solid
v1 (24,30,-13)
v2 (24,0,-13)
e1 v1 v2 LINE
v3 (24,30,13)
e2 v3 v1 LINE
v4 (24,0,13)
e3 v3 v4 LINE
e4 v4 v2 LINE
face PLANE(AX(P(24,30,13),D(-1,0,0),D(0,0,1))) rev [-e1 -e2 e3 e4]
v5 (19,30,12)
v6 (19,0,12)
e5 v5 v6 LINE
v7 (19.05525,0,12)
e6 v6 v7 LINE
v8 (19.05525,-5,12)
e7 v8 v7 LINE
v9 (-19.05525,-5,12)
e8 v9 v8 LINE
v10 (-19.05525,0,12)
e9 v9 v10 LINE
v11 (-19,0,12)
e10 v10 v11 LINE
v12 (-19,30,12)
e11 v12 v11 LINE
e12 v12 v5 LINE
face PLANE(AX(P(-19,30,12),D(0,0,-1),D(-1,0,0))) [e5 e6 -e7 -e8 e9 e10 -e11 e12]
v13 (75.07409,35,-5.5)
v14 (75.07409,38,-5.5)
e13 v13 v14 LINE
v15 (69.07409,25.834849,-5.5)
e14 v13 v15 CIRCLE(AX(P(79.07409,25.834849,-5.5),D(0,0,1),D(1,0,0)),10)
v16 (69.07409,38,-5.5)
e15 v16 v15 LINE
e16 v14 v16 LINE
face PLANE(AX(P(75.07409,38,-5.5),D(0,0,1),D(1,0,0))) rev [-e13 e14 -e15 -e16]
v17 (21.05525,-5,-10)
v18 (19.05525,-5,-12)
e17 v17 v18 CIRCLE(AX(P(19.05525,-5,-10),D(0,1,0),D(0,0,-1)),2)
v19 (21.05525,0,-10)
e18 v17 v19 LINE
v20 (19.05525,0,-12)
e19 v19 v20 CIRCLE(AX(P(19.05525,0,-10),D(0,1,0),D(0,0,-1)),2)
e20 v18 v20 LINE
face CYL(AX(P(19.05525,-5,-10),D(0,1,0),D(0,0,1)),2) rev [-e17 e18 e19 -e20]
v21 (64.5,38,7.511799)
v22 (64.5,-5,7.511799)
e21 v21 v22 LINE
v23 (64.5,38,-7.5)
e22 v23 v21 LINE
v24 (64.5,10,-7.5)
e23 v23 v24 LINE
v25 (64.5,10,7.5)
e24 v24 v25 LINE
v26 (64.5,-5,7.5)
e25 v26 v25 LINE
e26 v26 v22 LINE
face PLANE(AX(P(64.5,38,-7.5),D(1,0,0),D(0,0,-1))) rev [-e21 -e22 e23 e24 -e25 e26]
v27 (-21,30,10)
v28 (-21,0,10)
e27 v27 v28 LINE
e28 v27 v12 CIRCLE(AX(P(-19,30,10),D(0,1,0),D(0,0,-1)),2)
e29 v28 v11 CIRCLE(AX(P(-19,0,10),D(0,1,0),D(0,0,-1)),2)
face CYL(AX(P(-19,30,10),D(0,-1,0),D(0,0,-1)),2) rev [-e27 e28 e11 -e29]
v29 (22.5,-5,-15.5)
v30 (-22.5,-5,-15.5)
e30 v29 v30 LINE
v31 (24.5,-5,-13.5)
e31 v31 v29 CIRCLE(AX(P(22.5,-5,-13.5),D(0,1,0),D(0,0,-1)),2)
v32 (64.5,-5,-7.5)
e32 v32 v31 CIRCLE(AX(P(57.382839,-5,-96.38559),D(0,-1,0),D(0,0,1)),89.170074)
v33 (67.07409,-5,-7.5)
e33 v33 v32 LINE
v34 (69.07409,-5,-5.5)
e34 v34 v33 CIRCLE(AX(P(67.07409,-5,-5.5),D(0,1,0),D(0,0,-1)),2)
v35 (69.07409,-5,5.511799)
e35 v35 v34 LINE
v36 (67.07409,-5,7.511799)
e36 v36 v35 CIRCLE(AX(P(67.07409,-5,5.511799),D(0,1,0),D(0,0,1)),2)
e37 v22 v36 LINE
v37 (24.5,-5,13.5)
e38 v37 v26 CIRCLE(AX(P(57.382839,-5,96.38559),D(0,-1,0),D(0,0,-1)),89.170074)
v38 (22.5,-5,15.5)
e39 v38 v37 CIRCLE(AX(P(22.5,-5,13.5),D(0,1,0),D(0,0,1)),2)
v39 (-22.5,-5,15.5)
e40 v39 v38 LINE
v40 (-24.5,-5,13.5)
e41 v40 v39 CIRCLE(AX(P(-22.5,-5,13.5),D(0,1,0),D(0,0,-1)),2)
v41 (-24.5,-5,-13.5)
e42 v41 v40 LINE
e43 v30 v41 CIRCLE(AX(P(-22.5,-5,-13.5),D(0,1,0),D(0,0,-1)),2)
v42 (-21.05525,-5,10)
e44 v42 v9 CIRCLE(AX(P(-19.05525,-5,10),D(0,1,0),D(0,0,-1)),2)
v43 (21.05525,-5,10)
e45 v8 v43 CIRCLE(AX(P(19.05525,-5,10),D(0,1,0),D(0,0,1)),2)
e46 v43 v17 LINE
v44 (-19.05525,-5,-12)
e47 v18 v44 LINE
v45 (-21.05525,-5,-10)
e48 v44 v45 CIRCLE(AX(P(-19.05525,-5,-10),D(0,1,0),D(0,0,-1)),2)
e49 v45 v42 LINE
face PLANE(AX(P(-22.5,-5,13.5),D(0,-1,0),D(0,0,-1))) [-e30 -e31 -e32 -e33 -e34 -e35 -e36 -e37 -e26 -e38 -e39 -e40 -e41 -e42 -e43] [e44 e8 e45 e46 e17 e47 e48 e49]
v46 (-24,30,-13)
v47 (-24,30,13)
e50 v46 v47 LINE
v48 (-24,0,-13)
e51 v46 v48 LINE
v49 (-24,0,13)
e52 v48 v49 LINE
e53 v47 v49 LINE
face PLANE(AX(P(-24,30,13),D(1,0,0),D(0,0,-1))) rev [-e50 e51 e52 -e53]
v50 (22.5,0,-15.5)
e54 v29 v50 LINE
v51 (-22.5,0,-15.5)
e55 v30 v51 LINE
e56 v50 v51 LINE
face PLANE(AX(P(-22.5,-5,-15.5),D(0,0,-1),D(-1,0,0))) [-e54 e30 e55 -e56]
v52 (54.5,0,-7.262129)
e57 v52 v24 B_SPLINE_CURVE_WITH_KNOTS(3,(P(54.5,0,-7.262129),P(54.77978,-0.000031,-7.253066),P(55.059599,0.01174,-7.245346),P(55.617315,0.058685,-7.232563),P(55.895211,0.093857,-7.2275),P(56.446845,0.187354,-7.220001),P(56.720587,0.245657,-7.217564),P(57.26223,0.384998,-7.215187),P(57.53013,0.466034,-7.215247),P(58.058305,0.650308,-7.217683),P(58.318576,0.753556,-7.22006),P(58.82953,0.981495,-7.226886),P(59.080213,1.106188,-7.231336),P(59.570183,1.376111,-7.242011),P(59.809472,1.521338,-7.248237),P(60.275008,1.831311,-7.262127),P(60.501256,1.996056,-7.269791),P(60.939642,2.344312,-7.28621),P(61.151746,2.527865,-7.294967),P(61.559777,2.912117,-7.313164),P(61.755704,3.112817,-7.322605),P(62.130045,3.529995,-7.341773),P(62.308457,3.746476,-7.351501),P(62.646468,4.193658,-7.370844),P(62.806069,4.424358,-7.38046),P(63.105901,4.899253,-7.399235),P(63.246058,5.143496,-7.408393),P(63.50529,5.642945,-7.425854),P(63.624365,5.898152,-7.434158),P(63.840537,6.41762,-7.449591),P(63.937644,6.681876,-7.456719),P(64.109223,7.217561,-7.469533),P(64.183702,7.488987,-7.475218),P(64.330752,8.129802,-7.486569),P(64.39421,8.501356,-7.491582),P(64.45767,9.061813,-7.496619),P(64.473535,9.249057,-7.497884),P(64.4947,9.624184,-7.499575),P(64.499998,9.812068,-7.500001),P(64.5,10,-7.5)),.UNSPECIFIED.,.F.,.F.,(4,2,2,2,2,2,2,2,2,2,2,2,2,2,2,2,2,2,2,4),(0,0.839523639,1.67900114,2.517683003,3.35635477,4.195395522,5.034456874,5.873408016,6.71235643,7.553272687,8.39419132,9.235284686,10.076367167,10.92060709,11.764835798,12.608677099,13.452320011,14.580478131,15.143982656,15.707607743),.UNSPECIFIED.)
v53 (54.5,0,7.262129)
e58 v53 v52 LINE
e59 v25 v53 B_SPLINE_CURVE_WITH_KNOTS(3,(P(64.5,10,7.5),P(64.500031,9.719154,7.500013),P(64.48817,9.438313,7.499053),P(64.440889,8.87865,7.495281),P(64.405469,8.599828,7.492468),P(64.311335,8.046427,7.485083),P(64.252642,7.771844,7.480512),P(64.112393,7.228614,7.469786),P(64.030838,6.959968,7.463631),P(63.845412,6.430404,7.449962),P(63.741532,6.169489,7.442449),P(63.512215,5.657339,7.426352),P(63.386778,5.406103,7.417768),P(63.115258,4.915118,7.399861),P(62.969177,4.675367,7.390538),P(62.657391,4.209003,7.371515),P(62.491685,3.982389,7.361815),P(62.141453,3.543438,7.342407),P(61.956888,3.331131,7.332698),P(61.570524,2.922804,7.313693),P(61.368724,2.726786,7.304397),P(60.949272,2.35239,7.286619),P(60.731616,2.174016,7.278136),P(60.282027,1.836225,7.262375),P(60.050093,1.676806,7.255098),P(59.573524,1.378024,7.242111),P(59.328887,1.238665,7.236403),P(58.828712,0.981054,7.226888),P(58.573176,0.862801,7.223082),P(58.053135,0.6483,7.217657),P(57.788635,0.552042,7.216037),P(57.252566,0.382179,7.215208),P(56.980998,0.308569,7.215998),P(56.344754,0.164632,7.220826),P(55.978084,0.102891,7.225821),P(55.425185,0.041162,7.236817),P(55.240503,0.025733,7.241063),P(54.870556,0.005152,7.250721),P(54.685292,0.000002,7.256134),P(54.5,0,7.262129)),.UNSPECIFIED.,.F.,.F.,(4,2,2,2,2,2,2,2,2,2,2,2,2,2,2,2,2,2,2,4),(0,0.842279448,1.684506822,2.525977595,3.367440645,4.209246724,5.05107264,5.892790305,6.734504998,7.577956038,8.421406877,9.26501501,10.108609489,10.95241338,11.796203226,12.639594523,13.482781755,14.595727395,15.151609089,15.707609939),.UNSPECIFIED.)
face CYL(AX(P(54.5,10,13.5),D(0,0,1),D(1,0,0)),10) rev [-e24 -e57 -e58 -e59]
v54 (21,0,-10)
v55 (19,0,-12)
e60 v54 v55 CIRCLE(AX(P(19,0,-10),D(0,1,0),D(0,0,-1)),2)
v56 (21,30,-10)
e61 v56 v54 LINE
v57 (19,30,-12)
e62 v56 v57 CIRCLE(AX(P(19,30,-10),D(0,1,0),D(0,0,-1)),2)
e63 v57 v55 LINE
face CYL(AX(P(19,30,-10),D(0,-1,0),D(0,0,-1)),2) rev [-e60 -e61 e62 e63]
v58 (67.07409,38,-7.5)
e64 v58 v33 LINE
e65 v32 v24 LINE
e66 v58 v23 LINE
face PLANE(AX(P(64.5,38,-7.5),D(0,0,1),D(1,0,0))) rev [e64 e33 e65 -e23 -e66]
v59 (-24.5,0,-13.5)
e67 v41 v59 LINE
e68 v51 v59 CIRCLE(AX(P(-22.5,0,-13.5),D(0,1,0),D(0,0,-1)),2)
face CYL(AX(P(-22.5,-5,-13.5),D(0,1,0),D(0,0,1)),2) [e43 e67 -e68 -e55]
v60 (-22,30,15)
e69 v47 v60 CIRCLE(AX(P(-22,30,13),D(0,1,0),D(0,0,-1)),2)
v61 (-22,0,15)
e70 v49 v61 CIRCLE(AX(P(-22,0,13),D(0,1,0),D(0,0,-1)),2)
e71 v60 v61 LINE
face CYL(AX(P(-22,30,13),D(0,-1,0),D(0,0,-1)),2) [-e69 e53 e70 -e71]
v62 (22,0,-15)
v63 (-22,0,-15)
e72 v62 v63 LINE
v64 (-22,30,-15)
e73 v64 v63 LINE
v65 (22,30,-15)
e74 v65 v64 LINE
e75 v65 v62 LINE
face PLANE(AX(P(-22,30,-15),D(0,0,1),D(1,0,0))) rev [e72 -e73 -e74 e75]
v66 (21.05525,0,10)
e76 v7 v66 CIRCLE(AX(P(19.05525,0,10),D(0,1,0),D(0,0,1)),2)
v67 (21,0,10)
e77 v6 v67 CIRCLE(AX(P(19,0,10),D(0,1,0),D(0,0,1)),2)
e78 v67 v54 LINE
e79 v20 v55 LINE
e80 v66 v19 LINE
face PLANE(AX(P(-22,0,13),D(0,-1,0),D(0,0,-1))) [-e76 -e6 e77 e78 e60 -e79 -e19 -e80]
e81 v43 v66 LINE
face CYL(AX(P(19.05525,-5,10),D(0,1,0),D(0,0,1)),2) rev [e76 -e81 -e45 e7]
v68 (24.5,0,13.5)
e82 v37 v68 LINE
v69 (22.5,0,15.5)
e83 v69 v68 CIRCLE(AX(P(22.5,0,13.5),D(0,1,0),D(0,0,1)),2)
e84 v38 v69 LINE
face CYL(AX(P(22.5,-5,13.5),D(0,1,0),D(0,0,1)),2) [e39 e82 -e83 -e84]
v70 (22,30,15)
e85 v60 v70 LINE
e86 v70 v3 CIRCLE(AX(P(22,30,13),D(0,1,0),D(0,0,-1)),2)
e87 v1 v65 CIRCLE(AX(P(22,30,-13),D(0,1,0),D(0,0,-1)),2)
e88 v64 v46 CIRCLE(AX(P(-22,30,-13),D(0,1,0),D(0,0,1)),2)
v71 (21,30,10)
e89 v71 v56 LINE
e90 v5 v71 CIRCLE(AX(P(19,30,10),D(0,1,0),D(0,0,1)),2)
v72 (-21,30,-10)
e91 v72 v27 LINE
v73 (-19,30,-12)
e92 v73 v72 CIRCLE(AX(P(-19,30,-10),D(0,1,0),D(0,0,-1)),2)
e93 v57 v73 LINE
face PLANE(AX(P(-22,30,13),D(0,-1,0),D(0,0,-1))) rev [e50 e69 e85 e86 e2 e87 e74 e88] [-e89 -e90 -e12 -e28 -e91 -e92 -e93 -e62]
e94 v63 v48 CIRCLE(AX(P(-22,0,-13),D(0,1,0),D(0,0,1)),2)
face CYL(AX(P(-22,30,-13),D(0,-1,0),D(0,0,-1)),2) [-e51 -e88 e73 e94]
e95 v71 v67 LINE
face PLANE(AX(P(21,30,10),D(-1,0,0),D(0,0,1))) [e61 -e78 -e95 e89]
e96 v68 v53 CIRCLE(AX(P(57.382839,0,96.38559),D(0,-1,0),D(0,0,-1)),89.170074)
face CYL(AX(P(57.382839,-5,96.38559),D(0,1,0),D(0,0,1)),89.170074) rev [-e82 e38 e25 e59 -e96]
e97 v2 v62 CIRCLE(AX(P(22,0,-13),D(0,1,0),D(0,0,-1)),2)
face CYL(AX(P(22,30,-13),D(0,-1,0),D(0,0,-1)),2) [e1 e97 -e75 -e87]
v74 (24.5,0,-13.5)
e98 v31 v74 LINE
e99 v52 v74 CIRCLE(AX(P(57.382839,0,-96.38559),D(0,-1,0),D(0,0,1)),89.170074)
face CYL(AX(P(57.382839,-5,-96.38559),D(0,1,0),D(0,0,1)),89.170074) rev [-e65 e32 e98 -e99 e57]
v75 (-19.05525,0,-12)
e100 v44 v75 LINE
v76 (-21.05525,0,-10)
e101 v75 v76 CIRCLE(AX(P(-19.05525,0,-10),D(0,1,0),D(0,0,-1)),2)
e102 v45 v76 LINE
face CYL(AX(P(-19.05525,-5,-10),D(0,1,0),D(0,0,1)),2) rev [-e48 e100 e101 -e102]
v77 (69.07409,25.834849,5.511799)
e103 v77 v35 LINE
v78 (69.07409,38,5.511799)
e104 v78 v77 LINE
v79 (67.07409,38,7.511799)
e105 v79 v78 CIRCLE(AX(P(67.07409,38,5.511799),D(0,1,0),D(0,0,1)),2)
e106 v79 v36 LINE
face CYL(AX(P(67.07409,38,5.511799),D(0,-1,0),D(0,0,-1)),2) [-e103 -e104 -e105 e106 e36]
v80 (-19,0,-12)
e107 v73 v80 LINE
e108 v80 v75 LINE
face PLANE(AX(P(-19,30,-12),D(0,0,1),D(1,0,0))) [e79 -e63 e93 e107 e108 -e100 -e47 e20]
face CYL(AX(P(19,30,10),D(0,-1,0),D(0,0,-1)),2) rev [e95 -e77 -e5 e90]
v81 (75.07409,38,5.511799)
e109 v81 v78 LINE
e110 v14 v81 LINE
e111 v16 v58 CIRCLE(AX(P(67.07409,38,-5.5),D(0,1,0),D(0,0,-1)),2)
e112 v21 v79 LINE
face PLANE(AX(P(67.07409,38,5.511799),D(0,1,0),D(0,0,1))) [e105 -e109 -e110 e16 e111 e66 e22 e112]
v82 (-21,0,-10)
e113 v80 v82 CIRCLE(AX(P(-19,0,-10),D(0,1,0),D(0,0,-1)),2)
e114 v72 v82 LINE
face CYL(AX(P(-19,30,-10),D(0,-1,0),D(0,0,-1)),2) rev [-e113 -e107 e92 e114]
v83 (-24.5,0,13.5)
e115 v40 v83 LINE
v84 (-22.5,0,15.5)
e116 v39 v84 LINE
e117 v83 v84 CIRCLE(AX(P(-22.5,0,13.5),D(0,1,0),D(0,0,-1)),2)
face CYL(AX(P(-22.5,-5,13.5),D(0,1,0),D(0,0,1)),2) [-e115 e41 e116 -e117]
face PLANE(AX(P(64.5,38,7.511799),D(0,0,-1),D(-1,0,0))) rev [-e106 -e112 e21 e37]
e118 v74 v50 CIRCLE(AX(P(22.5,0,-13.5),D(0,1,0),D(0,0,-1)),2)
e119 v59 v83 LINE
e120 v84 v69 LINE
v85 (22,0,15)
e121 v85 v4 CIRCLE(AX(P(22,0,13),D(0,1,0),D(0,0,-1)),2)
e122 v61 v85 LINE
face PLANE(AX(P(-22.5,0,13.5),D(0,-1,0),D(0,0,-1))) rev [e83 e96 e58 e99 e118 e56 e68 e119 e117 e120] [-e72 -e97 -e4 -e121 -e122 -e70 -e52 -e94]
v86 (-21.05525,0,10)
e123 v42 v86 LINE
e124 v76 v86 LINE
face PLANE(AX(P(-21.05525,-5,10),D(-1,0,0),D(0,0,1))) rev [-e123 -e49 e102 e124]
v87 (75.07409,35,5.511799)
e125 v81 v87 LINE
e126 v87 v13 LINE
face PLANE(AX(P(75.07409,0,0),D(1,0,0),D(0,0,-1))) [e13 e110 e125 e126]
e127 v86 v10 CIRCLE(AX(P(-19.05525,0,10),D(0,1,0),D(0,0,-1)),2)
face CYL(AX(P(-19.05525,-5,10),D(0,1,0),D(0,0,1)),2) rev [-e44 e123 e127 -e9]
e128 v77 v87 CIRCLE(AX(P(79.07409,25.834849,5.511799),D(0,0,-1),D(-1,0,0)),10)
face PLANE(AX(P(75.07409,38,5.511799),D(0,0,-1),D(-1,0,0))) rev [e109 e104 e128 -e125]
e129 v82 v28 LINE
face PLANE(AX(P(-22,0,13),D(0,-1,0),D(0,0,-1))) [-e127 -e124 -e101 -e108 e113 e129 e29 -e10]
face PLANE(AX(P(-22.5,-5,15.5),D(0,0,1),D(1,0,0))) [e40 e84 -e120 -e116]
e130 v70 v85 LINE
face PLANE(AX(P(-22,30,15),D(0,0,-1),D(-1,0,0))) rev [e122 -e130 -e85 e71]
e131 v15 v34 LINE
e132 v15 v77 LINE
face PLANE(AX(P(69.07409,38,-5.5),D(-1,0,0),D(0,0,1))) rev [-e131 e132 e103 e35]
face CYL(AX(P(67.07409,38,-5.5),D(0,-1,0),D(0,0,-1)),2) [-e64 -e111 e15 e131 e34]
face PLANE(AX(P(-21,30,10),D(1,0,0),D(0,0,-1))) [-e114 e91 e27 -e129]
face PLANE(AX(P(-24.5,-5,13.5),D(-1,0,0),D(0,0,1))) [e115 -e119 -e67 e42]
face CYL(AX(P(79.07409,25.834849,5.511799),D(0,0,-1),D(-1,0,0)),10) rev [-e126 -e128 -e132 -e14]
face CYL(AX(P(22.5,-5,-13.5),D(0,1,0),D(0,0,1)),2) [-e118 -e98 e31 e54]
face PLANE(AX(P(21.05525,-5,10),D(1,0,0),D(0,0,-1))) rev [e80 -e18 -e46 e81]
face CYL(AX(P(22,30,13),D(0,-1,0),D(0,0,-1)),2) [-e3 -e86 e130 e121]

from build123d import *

# Parameters (mm, degrees)
SALIENTE_EXTRUIR2_DEPTH      = 30
SALIENTE_EXTRUIR3_DEPTH      = 5
SALIENTE_EXTRUIR6_DEPTH      = 5
SALIENTE_EXTRUIR7_DEPTH      = 38
SALIENTE_EXTRUIR7_DEPTH_BACK = 5
CROQUIS6_W                   = 11.011799298781469
CROQUIS6_H                   = 3.000000000000007
SALIENTE_EXTRUIR8_DEPTH      = 6
REDONDEO1_R                  = 10
REDONDEO2_R                  = 10


with BuildPart() as part:
    # Croquis1 → Saliente-Extruir2 (new body)
    with BuildSketch(Plane(origin=(0, 0, 0), x_dir=(1, 0, 0), z_dir=(0, 1, 0))):
        with BuildLine():
            Line((-22.000000000000007, 14.99999999999999), (21.999999999999964, 14.999999999999993))
            ThreePointArc((21.999999999999964, 14.999999999999993), (23.414213562373074, 14.414213562373087), (23.99999999999998, 12.999999999999977))
            Line((23.99999999999998, 12.999999999999977), (23.999999999999975, -12.999999999999996))
            ThreePointArc((23.999999999999975, -12.999999999999996), (23.41421356237307, -14.414213562373105), (21.99999999999996, -15.00000000000001))
            Line((21.99999999999996, -15.00000000000001), (-22.000000000000007, -15.000000000000007))
            ThreePointArc((-22.000000000000007, -15.000000000000007), (-23.414213562373117, -14.414213562373103), (-24.00000000000002, -12.999999999999993))
            Line((-24.00000000000002, -12.999999999999993), (-24.00000000000002, 12.999999999999975))
            ThreePointArc((-24.00000000000002, 12.999999999999975), (-23.414213562373117, 14.414213562373085), (-22.000000000000007, 14.99999999999999))
        make_face()
        with BuildLine():
            Line((-19.00000000000001, -12.00000000000001), (18.999999999999964, -12.00000000000001))
            ThreePointArc((18.999999999999964, -12.00000000000001), (20.414213562373074, -11.414213562373106), (20.999999999999982, -9.999999999999996))
            Line((20.999999999999982, -9.999999999999996), (20.999999999999982, 9.999999999999975))
            ThreePointArc((20.999999999999982, 9.999999999999975), (20.414213562373078, 11.414213562373085), (18.999999999999968, 11.99999999999999))
            Line((18.999999999999968, 11.99999999999999), (-19.000000000000007, 11.99999999999999))
            ThreePointArc((-19.000000000000007, 11.99999999999999), (-20.414213562373117, 11.414213562373083), (-21.00000000000002, 9.999999999999975))
            Line((-21.00000000000002, 9.999999999999975), (-21.00000000000002, -9.999999999999996))
            ThreePointArc((-21.00000000000002, -9.999999999999996), (-20.41421356237312, -11.414213562373106), (-19.00000000000001, -12.00000000000001))
        make_face(mode=Mode.SUBTRACT)
    extrude(amount=SALIENTE_EXTRUIR2_DEPTH)

    # Croquis3 → Saliente-Extruir3 (add)
    with BuildSketch(Plane(origin=(0, 0, 0), x_dir=(1, 0, 0), z_dir=(0, 1, 0))):
        with BuildLine():
            Line((-22.5, -15.500000000000004), (22.500000000000004, -15.500000000000004))
            ThreePointArc((22.500000000000004, -15.500000000000004), (23.9142135623731, -14.9142135623731), (24.500000000000007, -13.500000000000004))
            Line((24.500000000000007, -13.500000000000004), (24.500000000000007, 13.499999999999996))
            ThreePointArc((24.500000000000007, 13.499999999999996), (23.9142135623731, 14.914213562373092), (22.500000000000004, 15.499999999999996))
            Line((22.500000000000004, 15.499999999999996), (-22.5, 15.499999999999996))
            ThreePointArc((-22.5, 15.499999999999996), (-23.914213562373096, 14.914213562373092), (-24.5, 13.499999999999996))
            Line((-24.5, 13.499999999999996), (-24.5, -13.500000000000004))
            ThreePointArc((-24.5, -13.500000000000004), (-23.914213562373096, -14.9142135623731), (-22.5, -15.500000000000004))
        make_face()
        with BuildLine():
            Line((-19.05524973121013, -11.999999999999982), (19.055249731210118, -11.999999999999982))
            ThreePointArc((19.055249731210118, -11.999999999999982), (20.469463293583225, -11.414213562373076), (21.055249731210132, -9.99999999999997))
            Line((21.055249731210132, -9.99999999999997), (21.055249731210132, 9.999999999999975))
            ThreePointArc((21.055249731210132, 9.999999999999975), (20.469463293583225, 11.414213562373083), (19.055249731210118, 11.99999999999999))
            Line((19.055249731210118, 11.99999999999999), (-19.05524973121013, 11.99999999999999))
            ThreePointArc((-19.05524973121013, 11.99999999999999), (-20.469463293583242, 11.414213562373087), (-21.055249731210147, 9.999999999999975))
            Line((-21.055249731210147, 9.999999999999975), (-21.055249731210147, -9.99999999999997))
            ThreePointArc((-21.055249731210147, -9.99999999999997), (-20.46946329358324, -11.414213562373078), (-19.05524973121013, -11.999999999999982))
        make_face(mode=Mode.SUBTRACT)
    extrude(amount=-SALIENTE_EXTRUIR3_DEPTH)

    # Croquis4 → Saliente-Extruir6 (add)
    with BuildSketch(Plane(origin=(0, 0, 0), x_dir=(1, 0, 0), z_dir=(0, 1, 0))):
        with BuildLine():
            Line((24.500000000000007, 13.499999999999996), (24.500000000000004, -13.500000000000004))
            ThreePointArc((24.500000000000004, -13.500000000000004), (44.15530933646711, -8.202062243114), (64.5, -7.5))
            Line((64.5, -7.5), (64.5, 7.5))
            ThreePointArc((64.5, 7.5), (44.15530933646711, 8.202062243114), (24.500000000000007, 13.499999999999996))
        make_face()
    extrude(amount=-SALIENTE_EXTRUIR6_DEPTH)

    # Croquis5 → Saliente-Extruir7 (add, two sides: drawn at the far end of the back side and taken through both)
    with BuildSketch(Plane(origin=(0, 0, 0), x_dir=(1, 0, 0), z_dir=(0, 1, 0)).offset(-SALIENTE_EXTRUIR7_DEPTH_BACK)):
        with BuildLine():
            Line((64.5, 7.5), (67.07409002976354, 7.5))
            ThreePointArc((67.07409002976354, 7.5), (68.48830359213665, 6.914213562373095), (69.07409002976355, 5.499999999999986))
            Line((69.07409002976355, 5.499999999999986), (69.07409002976355, -5.511799298781482))
            ThreePointArc((69.07409002976355, -5.511799298781482), (68.48830359213665, -6.926012861154591), (67.07409002976354, -7.511799298781496))
            Line((67.07409002976354, -7.511799298781496), (64.5, -7.511799298781496))
            Line((64.5, -7.511799298781496), (64.5, 7.5))
        make_face()
    extrude(amount=SALIENTE_EXTRUIR7_DEPTH + SALIENTE_EXTRUIR7_DEPTH_BACK)

    # Croquis6 → Saliente-Extruir8 (add)
    with BuildSketch(Plane(origin=(69.07409002976355, 0, 0), x_dir=(0, 0, -1), z_dir=(1, 0, 0))):
        with Locations((-0.00589964939074816, 36.5)):
            Rectangle(CROQUIS6_W, CROQUIS6_H)
    extrude(amount=SALIENTE_EXTRUIR8_DEPTH)

    # Redondeo1
    # the kernel refuses this fillet: 10 mm, written as the material it adds along each edge
    with BuildSketch(Plane(origin=(69.07409002976355, 34.99999999999999, -5.499999999999986), x_dir=(0, -1, 0), z_dir=(0, 0, 1))) as redondeo1_piece_1:
        with BuildLine():
            CenterArc((9.165151389911681, 10), REDONDEO1_R, 203.57817847820183, 66.42182152179817)
            Line((0, 6), (-0.1833030277982317, 5.920000000000002))
            ThreePointArc((-0.1833030277982317, 5.920000000000002), (-0.20000000000000284, 3), (-0.20000000000000284, 0))
            Line((-0.20000000000000284, 0), (0, -0.20000000000000284))
            Line((0, -0.20000000000000284), (9.165151389911681, -0.20000000000000284))
            Line((9.165151389911681, -0.20000000000000284), (9.165151389911681, 0))
        make_face()
    extrude(amount=11.011799298781469)

    # Redondeo2
    # the kernel refuses this fillet: 10 mm, written as the material it adds along each edge
    with BuildSketch(Plane(origin=(64.5, 0, 32.5), x_dir=(0, 1, 0), z_dir=(0, 0, -1))) as redondeo2_piece_1_section:
        with BuildLine():
            CenterArc((REDONDEO2_R, -REDONDEO2_R), REDONDEO2_R, 90, 90)
            Line((-1.78e-15, -REDONDEO2_R), (0, 0))
            Line((0, 0), (REDONDEO2_R, 0))
        make_face()
    redondeo2_piece_1 = extrude(amount=40, mode=Mode.PRIVATE)
    redondeo2_piece_1 = redondeo2_piece_1 - Plane(origin=(57.38283856523079, 2.2812859776198304, 96.38559043487189), x_dir=(-0.3687654044862285, 0, -0.9295224991650866), z_dir=(0, 1, 0)) * Cylinder(89.17007442995858, 120, mode=Mode.PRIVATE)
    redondeo2_piece_1 = redondeo2_piece_1 - Plane(origin=(57.38283856523077, 2.2812859776198304, -96.38559043487177), x_dir=(0.07981558252886325, 0, 0.9968096472173502), z_dir=(0, 1, 0)) * Cylinder(89.17007442995846, 120, mode=Mode.PRIVATE)
    add(redondeo2_piece_1)


solid = part.part
